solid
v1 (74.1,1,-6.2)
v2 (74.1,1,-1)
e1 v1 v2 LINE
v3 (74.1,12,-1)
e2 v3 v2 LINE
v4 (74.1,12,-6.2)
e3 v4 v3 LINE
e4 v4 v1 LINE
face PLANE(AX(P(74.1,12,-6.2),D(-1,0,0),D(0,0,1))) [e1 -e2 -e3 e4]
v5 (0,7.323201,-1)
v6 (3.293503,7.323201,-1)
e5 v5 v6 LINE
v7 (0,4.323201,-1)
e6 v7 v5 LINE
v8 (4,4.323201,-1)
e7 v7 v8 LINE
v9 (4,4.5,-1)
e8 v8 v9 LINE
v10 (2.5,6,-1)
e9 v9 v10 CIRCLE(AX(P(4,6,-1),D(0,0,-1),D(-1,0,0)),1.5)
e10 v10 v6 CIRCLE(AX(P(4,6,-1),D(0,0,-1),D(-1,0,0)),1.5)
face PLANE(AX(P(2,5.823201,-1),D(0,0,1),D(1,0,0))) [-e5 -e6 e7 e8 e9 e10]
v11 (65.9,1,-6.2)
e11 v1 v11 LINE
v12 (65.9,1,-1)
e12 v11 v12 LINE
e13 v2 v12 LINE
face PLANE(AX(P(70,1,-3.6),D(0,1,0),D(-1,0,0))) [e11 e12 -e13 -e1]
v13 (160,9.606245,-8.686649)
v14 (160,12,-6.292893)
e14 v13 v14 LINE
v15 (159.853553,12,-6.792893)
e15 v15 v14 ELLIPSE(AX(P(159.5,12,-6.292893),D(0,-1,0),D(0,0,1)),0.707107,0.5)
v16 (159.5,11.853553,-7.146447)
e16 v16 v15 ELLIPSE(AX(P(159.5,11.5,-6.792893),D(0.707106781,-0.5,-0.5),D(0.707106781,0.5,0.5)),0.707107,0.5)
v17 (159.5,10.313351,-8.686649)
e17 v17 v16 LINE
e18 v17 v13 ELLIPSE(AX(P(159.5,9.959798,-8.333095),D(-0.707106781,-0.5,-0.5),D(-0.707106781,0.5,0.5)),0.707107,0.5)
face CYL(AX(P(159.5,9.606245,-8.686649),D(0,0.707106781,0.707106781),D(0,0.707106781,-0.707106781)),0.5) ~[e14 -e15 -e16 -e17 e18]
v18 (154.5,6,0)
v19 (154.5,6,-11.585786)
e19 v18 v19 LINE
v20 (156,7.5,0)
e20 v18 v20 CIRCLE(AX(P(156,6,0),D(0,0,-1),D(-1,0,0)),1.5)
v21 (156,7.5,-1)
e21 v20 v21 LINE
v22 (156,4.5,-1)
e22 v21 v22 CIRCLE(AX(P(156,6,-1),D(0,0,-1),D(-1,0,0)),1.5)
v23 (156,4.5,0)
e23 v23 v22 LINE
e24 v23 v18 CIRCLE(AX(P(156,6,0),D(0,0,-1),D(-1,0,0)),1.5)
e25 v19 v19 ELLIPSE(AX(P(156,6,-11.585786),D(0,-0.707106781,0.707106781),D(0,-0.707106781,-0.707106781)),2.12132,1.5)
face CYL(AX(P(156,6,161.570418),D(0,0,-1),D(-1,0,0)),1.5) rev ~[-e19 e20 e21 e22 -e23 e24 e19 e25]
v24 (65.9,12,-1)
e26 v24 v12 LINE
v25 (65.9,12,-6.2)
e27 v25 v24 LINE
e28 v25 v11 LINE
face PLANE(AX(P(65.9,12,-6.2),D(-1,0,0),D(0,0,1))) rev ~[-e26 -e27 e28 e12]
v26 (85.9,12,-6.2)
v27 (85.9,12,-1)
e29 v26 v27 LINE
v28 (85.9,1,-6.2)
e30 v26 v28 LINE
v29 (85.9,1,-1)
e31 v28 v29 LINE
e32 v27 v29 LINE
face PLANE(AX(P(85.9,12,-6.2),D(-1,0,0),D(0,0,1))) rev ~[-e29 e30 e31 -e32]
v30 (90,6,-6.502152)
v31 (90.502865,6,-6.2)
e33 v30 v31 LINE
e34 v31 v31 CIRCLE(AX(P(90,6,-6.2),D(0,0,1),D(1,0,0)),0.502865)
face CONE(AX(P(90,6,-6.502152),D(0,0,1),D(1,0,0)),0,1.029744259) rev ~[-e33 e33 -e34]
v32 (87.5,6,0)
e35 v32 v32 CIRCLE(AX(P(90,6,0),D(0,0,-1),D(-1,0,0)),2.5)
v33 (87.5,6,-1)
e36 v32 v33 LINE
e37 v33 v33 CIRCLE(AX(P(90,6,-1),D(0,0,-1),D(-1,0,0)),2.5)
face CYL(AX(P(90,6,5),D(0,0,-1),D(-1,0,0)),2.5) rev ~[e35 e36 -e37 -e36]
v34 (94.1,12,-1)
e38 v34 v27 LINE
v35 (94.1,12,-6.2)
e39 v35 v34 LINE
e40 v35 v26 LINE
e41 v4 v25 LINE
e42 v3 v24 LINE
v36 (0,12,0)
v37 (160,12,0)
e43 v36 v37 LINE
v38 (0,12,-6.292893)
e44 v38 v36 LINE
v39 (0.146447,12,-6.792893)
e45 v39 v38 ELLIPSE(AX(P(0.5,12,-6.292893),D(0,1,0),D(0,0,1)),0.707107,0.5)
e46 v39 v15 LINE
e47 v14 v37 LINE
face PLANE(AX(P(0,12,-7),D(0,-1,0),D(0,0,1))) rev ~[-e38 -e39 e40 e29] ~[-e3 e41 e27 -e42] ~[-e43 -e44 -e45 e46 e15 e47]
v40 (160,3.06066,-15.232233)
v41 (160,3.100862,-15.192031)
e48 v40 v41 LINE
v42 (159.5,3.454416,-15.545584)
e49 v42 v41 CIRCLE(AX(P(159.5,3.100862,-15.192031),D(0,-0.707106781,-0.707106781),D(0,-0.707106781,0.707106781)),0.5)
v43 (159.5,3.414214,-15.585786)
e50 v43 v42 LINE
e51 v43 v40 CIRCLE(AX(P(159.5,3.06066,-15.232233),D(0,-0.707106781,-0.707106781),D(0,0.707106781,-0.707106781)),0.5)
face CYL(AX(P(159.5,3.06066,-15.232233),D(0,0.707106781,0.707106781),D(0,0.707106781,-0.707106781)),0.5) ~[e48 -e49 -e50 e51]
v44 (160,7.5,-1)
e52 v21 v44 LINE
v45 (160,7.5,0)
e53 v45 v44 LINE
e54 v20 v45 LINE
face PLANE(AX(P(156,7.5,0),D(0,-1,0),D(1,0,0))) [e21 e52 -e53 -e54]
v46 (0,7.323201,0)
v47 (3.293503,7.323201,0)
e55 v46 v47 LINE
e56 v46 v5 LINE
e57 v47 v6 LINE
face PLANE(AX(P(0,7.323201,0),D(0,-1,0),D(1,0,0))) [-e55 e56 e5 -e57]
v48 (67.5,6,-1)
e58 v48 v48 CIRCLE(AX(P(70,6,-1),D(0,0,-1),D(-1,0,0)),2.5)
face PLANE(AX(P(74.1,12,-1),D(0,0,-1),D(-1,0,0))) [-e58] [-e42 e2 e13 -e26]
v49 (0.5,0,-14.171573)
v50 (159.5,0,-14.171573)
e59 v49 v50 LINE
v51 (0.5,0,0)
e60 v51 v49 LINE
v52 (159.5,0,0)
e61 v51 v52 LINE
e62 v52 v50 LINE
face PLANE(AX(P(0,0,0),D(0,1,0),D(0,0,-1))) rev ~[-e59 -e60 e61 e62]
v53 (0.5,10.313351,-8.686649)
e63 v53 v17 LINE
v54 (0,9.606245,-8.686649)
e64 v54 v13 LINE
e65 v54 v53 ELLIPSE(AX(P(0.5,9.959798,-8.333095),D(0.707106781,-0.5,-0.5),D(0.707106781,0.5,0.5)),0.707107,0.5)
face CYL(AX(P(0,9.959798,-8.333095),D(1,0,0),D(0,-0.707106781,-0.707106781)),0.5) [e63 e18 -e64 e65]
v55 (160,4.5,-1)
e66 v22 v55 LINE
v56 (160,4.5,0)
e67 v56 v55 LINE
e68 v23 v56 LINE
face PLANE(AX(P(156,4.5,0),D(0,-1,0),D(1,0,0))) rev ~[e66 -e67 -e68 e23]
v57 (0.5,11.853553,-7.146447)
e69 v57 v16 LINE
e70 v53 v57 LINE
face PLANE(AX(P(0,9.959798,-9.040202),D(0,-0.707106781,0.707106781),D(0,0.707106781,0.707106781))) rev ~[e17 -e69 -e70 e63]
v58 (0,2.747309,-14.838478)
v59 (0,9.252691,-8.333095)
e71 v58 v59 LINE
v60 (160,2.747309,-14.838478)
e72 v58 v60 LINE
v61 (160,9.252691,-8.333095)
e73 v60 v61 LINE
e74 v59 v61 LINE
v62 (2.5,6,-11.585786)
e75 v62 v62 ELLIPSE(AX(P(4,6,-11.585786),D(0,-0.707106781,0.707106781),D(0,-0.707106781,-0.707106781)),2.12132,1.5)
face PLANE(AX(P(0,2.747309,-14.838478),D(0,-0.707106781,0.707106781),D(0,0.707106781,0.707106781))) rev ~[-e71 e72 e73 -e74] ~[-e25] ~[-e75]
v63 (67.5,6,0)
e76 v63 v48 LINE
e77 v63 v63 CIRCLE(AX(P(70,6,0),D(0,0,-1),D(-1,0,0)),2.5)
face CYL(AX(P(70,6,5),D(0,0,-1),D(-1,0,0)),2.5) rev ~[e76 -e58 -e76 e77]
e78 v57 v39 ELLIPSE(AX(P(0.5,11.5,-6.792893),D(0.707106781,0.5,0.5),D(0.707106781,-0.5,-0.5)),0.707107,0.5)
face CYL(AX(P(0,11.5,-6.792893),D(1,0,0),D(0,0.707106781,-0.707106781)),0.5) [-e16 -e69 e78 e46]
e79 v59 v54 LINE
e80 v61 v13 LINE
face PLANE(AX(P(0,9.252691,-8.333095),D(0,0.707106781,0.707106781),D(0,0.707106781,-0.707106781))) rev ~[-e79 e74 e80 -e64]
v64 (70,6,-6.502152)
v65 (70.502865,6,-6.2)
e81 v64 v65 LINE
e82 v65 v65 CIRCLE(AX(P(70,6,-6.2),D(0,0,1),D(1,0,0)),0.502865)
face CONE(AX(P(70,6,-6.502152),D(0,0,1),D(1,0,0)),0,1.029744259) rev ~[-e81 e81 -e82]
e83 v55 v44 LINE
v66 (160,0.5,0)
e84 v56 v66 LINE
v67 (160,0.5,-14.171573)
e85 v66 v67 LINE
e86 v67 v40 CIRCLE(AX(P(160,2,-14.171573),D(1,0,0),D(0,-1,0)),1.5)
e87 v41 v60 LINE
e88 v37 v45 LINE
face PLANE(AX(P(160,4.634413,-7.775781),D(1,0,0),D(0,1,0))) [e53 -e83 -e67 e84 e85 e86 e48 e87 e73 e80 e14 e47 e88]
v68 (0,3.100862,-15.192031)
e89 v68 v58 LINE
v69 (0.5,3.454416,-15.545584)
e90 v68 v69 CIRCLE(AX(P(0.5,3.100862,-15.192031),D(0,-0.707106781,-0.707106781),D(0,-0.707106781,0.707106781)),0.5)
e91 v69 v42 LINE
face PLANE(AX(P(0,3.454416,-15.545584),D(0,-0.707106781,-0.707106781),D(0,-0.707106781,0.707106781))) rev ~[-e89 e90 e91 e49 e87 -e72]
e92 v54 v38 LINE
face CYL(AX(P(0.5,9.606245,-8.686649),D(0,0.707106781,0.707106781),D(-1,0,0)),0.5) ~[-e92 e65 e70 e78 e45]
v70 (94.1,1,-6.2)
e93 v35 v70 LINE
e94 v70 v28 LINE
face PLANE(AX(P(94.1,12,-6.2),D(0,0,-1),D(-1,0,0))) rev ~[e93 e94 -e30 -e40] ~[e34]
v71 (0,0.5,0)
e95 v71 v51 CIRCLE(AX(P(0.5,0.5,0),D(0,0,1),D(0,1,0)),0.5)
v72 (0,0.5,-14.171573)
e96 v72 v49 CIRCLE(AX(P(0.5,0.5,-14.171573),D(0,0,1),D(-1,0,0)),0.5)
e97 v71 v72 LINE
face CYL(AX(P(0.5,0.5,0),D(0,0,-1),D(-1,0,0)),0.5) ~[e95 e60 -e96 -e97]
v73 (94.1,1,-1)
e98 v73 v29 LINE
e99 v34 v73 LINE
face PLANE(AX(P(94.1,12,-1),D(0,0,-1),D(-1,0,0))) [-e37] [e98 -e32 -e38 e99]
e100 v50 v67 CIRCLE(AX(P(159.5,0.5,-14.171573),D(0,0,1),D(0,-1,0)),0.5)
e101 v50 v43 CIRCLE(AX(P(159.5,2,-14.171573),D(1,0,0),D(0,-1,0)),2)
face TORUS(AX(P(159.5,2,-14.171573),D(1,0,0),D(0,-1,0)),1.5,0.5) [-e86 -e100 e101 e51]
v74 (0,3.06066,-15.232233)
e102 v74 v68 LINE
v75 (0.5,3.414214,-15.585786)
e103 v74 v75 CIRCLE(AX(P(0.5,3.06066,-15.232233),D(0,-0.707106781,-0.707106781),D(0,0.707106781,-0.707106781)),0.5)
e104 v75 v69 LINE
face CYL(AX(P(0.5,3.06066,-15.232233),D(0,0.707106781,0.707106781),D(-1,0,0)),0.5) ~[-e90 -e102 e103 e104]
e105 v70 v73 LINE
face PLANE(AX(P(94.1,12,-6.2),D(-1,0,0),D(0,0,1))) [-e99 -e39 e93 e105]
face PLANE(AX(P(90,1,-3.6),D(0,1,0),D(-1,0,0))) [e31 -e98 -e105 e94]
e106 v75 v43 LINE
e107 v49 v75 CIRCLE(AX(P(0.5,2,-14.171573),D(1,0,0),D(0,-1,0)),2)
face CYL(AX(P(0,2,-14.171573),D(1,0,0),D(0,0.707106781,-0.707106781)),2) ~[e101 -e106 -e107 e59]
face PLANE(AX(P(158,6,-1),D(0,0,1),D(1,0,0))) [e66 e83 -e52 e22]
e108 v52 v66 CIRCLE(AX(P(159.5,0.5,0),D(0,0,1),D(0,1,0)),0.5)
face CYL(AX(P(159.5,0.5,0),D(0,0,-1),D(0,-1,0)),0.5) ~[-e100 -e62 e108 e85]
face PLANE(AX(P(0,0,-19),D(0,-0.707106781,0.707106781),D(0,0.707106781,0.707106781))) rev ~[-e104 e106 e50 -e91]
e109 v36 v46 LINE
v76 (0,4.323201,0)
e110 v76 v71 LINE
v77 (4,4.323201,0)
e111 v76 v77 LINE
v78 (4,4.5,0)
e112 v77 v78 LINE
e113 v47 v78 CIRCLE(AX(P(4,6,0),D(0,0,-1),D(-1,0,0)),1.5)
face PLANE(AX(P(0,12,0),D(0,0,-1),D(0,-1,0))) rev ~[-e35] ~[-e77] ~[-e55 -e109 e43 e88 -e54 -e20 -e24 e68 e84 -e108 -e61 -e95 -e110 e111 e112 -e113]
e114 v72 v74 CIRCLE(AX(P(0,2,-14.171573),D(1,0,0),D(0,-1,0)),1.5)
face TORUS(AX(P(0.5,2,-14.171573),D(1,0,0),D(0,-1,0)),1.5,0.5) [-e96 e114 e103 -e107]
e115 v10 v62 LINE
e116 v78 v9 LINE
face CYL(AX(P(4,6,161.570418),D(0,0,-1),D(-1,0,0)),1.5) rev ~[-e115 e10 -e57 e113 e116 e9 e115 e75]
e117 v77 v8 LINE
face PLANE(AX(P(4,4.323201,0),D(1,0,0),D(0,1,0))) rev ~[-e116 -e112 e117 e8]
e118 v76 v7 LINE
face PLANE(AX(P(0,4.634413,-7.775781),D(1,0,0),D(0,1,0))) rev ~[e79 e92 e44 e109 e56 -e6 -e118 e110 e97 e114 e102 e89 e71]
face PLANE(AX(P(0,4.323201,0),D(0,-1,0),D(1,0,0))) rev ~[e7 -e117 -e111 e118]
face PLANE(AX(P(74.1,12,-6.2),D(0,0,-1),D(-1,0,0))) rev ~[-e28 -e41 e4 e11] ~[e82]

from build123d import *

# Parameters (mm, degrees)
F1_DEPTH = 160
F3_D     = 5
F3_DEPTH = 5
F3_TIP   = 1.5021515476
F4_W     = 8.2
F4_H     = 5.2
F5_DEPTH = 11
F7_D     = 3
F6_W     = 4
F6_H     = 3
F8_DEPTH = 1
F9_R     = 2
F10_R    = 0.5


# Not quite as in the source:
# - a feature names something its author has since deleted; it is built from what else it names


with BuildPart() as f1:
    # F0 (on Right) → F1 (new body)
    with BuildSketch(Plane.YZ):
        Polygon((9.9597979746, -9.0402020254), (12, -7), (12, 0), (0, 0), (0, -6.5), (0, -19), (3.4544155877, -15.5455844123), (2.7473088065, -14.8384776311), (9.2526911935, -8.3330952442), align=None)
    extrude(amount=F1_DEPTH)

    # F3
    with Locations(Plane.XY):
        with Locations((90, 6), (70, 6)):
            Hole(F3_D / 2, depth=F3_DEPTH)
            with Locations((0, 0, -(F3_DEPTH + F3_TIP / 2))):  # 118° drill point
                Cone(0, F3_D / 2, F3_TIP, mode=Mode.SUBTRACT)

    # F4 (on face) → F5 (cut)
    with BuildSketch(Plane(origin=(0, 12, 0), x_dir=(-1, 0, 0), z_dir=(0, 1, 0))):
        with Locations((-90, -3.6)):
            Rectangle(F4_W, F4_H)
        with Locations((-70, -3.6)):
            Rectangle(F4_W, F4_H)
    extrude(amount=-F5_DEPTH, mode=Mode.SUBTRACT)

    # F7 (through all)
    with Locations(Plane.XY):
        with Locations((4, 6), (156, 6)):
            Hole(F7_D / 2)

    # F6 (on Top) → F8 (cut)
    with BuildSketch(Plane.XY):
        with Locations((158, 6)):
            Rectangle(F6_W, F6_H)
        with Locations((2, 5.8232012801)):
            Rectangle(F6_W, F6_H)
    extrude(amount=-F8_DEPTH, mode=Mode.SUBTRACT)

    # F9
    f9_edges = [f1.edges().sort_by_distance(p)[0] for p in [
        (80, 0, -19),
    ]]
    fillet(f9_edges, radius=F9_R)

    # F10
    f10_edges = [f1.edges().sort_by_distance(p)[0] for p in [
        (160, 10.979899, -8.020101),
        (0, 10.979899, -8.020101),
        (160, 3.434315, -15.565685),
        (0, 3.434315, -15.565685),
        (0, 1.234633, -16.019332),
        (0, 0, -7.085786),
        (160, 1.234633, -16.019332),
        (160, 0, -7.085786),
        (80, 9.959798, -9.040202),
        (80, 12, -7),
    ]]
    fillet(f10_edges, radius=F10_R)


solid = f1.part
